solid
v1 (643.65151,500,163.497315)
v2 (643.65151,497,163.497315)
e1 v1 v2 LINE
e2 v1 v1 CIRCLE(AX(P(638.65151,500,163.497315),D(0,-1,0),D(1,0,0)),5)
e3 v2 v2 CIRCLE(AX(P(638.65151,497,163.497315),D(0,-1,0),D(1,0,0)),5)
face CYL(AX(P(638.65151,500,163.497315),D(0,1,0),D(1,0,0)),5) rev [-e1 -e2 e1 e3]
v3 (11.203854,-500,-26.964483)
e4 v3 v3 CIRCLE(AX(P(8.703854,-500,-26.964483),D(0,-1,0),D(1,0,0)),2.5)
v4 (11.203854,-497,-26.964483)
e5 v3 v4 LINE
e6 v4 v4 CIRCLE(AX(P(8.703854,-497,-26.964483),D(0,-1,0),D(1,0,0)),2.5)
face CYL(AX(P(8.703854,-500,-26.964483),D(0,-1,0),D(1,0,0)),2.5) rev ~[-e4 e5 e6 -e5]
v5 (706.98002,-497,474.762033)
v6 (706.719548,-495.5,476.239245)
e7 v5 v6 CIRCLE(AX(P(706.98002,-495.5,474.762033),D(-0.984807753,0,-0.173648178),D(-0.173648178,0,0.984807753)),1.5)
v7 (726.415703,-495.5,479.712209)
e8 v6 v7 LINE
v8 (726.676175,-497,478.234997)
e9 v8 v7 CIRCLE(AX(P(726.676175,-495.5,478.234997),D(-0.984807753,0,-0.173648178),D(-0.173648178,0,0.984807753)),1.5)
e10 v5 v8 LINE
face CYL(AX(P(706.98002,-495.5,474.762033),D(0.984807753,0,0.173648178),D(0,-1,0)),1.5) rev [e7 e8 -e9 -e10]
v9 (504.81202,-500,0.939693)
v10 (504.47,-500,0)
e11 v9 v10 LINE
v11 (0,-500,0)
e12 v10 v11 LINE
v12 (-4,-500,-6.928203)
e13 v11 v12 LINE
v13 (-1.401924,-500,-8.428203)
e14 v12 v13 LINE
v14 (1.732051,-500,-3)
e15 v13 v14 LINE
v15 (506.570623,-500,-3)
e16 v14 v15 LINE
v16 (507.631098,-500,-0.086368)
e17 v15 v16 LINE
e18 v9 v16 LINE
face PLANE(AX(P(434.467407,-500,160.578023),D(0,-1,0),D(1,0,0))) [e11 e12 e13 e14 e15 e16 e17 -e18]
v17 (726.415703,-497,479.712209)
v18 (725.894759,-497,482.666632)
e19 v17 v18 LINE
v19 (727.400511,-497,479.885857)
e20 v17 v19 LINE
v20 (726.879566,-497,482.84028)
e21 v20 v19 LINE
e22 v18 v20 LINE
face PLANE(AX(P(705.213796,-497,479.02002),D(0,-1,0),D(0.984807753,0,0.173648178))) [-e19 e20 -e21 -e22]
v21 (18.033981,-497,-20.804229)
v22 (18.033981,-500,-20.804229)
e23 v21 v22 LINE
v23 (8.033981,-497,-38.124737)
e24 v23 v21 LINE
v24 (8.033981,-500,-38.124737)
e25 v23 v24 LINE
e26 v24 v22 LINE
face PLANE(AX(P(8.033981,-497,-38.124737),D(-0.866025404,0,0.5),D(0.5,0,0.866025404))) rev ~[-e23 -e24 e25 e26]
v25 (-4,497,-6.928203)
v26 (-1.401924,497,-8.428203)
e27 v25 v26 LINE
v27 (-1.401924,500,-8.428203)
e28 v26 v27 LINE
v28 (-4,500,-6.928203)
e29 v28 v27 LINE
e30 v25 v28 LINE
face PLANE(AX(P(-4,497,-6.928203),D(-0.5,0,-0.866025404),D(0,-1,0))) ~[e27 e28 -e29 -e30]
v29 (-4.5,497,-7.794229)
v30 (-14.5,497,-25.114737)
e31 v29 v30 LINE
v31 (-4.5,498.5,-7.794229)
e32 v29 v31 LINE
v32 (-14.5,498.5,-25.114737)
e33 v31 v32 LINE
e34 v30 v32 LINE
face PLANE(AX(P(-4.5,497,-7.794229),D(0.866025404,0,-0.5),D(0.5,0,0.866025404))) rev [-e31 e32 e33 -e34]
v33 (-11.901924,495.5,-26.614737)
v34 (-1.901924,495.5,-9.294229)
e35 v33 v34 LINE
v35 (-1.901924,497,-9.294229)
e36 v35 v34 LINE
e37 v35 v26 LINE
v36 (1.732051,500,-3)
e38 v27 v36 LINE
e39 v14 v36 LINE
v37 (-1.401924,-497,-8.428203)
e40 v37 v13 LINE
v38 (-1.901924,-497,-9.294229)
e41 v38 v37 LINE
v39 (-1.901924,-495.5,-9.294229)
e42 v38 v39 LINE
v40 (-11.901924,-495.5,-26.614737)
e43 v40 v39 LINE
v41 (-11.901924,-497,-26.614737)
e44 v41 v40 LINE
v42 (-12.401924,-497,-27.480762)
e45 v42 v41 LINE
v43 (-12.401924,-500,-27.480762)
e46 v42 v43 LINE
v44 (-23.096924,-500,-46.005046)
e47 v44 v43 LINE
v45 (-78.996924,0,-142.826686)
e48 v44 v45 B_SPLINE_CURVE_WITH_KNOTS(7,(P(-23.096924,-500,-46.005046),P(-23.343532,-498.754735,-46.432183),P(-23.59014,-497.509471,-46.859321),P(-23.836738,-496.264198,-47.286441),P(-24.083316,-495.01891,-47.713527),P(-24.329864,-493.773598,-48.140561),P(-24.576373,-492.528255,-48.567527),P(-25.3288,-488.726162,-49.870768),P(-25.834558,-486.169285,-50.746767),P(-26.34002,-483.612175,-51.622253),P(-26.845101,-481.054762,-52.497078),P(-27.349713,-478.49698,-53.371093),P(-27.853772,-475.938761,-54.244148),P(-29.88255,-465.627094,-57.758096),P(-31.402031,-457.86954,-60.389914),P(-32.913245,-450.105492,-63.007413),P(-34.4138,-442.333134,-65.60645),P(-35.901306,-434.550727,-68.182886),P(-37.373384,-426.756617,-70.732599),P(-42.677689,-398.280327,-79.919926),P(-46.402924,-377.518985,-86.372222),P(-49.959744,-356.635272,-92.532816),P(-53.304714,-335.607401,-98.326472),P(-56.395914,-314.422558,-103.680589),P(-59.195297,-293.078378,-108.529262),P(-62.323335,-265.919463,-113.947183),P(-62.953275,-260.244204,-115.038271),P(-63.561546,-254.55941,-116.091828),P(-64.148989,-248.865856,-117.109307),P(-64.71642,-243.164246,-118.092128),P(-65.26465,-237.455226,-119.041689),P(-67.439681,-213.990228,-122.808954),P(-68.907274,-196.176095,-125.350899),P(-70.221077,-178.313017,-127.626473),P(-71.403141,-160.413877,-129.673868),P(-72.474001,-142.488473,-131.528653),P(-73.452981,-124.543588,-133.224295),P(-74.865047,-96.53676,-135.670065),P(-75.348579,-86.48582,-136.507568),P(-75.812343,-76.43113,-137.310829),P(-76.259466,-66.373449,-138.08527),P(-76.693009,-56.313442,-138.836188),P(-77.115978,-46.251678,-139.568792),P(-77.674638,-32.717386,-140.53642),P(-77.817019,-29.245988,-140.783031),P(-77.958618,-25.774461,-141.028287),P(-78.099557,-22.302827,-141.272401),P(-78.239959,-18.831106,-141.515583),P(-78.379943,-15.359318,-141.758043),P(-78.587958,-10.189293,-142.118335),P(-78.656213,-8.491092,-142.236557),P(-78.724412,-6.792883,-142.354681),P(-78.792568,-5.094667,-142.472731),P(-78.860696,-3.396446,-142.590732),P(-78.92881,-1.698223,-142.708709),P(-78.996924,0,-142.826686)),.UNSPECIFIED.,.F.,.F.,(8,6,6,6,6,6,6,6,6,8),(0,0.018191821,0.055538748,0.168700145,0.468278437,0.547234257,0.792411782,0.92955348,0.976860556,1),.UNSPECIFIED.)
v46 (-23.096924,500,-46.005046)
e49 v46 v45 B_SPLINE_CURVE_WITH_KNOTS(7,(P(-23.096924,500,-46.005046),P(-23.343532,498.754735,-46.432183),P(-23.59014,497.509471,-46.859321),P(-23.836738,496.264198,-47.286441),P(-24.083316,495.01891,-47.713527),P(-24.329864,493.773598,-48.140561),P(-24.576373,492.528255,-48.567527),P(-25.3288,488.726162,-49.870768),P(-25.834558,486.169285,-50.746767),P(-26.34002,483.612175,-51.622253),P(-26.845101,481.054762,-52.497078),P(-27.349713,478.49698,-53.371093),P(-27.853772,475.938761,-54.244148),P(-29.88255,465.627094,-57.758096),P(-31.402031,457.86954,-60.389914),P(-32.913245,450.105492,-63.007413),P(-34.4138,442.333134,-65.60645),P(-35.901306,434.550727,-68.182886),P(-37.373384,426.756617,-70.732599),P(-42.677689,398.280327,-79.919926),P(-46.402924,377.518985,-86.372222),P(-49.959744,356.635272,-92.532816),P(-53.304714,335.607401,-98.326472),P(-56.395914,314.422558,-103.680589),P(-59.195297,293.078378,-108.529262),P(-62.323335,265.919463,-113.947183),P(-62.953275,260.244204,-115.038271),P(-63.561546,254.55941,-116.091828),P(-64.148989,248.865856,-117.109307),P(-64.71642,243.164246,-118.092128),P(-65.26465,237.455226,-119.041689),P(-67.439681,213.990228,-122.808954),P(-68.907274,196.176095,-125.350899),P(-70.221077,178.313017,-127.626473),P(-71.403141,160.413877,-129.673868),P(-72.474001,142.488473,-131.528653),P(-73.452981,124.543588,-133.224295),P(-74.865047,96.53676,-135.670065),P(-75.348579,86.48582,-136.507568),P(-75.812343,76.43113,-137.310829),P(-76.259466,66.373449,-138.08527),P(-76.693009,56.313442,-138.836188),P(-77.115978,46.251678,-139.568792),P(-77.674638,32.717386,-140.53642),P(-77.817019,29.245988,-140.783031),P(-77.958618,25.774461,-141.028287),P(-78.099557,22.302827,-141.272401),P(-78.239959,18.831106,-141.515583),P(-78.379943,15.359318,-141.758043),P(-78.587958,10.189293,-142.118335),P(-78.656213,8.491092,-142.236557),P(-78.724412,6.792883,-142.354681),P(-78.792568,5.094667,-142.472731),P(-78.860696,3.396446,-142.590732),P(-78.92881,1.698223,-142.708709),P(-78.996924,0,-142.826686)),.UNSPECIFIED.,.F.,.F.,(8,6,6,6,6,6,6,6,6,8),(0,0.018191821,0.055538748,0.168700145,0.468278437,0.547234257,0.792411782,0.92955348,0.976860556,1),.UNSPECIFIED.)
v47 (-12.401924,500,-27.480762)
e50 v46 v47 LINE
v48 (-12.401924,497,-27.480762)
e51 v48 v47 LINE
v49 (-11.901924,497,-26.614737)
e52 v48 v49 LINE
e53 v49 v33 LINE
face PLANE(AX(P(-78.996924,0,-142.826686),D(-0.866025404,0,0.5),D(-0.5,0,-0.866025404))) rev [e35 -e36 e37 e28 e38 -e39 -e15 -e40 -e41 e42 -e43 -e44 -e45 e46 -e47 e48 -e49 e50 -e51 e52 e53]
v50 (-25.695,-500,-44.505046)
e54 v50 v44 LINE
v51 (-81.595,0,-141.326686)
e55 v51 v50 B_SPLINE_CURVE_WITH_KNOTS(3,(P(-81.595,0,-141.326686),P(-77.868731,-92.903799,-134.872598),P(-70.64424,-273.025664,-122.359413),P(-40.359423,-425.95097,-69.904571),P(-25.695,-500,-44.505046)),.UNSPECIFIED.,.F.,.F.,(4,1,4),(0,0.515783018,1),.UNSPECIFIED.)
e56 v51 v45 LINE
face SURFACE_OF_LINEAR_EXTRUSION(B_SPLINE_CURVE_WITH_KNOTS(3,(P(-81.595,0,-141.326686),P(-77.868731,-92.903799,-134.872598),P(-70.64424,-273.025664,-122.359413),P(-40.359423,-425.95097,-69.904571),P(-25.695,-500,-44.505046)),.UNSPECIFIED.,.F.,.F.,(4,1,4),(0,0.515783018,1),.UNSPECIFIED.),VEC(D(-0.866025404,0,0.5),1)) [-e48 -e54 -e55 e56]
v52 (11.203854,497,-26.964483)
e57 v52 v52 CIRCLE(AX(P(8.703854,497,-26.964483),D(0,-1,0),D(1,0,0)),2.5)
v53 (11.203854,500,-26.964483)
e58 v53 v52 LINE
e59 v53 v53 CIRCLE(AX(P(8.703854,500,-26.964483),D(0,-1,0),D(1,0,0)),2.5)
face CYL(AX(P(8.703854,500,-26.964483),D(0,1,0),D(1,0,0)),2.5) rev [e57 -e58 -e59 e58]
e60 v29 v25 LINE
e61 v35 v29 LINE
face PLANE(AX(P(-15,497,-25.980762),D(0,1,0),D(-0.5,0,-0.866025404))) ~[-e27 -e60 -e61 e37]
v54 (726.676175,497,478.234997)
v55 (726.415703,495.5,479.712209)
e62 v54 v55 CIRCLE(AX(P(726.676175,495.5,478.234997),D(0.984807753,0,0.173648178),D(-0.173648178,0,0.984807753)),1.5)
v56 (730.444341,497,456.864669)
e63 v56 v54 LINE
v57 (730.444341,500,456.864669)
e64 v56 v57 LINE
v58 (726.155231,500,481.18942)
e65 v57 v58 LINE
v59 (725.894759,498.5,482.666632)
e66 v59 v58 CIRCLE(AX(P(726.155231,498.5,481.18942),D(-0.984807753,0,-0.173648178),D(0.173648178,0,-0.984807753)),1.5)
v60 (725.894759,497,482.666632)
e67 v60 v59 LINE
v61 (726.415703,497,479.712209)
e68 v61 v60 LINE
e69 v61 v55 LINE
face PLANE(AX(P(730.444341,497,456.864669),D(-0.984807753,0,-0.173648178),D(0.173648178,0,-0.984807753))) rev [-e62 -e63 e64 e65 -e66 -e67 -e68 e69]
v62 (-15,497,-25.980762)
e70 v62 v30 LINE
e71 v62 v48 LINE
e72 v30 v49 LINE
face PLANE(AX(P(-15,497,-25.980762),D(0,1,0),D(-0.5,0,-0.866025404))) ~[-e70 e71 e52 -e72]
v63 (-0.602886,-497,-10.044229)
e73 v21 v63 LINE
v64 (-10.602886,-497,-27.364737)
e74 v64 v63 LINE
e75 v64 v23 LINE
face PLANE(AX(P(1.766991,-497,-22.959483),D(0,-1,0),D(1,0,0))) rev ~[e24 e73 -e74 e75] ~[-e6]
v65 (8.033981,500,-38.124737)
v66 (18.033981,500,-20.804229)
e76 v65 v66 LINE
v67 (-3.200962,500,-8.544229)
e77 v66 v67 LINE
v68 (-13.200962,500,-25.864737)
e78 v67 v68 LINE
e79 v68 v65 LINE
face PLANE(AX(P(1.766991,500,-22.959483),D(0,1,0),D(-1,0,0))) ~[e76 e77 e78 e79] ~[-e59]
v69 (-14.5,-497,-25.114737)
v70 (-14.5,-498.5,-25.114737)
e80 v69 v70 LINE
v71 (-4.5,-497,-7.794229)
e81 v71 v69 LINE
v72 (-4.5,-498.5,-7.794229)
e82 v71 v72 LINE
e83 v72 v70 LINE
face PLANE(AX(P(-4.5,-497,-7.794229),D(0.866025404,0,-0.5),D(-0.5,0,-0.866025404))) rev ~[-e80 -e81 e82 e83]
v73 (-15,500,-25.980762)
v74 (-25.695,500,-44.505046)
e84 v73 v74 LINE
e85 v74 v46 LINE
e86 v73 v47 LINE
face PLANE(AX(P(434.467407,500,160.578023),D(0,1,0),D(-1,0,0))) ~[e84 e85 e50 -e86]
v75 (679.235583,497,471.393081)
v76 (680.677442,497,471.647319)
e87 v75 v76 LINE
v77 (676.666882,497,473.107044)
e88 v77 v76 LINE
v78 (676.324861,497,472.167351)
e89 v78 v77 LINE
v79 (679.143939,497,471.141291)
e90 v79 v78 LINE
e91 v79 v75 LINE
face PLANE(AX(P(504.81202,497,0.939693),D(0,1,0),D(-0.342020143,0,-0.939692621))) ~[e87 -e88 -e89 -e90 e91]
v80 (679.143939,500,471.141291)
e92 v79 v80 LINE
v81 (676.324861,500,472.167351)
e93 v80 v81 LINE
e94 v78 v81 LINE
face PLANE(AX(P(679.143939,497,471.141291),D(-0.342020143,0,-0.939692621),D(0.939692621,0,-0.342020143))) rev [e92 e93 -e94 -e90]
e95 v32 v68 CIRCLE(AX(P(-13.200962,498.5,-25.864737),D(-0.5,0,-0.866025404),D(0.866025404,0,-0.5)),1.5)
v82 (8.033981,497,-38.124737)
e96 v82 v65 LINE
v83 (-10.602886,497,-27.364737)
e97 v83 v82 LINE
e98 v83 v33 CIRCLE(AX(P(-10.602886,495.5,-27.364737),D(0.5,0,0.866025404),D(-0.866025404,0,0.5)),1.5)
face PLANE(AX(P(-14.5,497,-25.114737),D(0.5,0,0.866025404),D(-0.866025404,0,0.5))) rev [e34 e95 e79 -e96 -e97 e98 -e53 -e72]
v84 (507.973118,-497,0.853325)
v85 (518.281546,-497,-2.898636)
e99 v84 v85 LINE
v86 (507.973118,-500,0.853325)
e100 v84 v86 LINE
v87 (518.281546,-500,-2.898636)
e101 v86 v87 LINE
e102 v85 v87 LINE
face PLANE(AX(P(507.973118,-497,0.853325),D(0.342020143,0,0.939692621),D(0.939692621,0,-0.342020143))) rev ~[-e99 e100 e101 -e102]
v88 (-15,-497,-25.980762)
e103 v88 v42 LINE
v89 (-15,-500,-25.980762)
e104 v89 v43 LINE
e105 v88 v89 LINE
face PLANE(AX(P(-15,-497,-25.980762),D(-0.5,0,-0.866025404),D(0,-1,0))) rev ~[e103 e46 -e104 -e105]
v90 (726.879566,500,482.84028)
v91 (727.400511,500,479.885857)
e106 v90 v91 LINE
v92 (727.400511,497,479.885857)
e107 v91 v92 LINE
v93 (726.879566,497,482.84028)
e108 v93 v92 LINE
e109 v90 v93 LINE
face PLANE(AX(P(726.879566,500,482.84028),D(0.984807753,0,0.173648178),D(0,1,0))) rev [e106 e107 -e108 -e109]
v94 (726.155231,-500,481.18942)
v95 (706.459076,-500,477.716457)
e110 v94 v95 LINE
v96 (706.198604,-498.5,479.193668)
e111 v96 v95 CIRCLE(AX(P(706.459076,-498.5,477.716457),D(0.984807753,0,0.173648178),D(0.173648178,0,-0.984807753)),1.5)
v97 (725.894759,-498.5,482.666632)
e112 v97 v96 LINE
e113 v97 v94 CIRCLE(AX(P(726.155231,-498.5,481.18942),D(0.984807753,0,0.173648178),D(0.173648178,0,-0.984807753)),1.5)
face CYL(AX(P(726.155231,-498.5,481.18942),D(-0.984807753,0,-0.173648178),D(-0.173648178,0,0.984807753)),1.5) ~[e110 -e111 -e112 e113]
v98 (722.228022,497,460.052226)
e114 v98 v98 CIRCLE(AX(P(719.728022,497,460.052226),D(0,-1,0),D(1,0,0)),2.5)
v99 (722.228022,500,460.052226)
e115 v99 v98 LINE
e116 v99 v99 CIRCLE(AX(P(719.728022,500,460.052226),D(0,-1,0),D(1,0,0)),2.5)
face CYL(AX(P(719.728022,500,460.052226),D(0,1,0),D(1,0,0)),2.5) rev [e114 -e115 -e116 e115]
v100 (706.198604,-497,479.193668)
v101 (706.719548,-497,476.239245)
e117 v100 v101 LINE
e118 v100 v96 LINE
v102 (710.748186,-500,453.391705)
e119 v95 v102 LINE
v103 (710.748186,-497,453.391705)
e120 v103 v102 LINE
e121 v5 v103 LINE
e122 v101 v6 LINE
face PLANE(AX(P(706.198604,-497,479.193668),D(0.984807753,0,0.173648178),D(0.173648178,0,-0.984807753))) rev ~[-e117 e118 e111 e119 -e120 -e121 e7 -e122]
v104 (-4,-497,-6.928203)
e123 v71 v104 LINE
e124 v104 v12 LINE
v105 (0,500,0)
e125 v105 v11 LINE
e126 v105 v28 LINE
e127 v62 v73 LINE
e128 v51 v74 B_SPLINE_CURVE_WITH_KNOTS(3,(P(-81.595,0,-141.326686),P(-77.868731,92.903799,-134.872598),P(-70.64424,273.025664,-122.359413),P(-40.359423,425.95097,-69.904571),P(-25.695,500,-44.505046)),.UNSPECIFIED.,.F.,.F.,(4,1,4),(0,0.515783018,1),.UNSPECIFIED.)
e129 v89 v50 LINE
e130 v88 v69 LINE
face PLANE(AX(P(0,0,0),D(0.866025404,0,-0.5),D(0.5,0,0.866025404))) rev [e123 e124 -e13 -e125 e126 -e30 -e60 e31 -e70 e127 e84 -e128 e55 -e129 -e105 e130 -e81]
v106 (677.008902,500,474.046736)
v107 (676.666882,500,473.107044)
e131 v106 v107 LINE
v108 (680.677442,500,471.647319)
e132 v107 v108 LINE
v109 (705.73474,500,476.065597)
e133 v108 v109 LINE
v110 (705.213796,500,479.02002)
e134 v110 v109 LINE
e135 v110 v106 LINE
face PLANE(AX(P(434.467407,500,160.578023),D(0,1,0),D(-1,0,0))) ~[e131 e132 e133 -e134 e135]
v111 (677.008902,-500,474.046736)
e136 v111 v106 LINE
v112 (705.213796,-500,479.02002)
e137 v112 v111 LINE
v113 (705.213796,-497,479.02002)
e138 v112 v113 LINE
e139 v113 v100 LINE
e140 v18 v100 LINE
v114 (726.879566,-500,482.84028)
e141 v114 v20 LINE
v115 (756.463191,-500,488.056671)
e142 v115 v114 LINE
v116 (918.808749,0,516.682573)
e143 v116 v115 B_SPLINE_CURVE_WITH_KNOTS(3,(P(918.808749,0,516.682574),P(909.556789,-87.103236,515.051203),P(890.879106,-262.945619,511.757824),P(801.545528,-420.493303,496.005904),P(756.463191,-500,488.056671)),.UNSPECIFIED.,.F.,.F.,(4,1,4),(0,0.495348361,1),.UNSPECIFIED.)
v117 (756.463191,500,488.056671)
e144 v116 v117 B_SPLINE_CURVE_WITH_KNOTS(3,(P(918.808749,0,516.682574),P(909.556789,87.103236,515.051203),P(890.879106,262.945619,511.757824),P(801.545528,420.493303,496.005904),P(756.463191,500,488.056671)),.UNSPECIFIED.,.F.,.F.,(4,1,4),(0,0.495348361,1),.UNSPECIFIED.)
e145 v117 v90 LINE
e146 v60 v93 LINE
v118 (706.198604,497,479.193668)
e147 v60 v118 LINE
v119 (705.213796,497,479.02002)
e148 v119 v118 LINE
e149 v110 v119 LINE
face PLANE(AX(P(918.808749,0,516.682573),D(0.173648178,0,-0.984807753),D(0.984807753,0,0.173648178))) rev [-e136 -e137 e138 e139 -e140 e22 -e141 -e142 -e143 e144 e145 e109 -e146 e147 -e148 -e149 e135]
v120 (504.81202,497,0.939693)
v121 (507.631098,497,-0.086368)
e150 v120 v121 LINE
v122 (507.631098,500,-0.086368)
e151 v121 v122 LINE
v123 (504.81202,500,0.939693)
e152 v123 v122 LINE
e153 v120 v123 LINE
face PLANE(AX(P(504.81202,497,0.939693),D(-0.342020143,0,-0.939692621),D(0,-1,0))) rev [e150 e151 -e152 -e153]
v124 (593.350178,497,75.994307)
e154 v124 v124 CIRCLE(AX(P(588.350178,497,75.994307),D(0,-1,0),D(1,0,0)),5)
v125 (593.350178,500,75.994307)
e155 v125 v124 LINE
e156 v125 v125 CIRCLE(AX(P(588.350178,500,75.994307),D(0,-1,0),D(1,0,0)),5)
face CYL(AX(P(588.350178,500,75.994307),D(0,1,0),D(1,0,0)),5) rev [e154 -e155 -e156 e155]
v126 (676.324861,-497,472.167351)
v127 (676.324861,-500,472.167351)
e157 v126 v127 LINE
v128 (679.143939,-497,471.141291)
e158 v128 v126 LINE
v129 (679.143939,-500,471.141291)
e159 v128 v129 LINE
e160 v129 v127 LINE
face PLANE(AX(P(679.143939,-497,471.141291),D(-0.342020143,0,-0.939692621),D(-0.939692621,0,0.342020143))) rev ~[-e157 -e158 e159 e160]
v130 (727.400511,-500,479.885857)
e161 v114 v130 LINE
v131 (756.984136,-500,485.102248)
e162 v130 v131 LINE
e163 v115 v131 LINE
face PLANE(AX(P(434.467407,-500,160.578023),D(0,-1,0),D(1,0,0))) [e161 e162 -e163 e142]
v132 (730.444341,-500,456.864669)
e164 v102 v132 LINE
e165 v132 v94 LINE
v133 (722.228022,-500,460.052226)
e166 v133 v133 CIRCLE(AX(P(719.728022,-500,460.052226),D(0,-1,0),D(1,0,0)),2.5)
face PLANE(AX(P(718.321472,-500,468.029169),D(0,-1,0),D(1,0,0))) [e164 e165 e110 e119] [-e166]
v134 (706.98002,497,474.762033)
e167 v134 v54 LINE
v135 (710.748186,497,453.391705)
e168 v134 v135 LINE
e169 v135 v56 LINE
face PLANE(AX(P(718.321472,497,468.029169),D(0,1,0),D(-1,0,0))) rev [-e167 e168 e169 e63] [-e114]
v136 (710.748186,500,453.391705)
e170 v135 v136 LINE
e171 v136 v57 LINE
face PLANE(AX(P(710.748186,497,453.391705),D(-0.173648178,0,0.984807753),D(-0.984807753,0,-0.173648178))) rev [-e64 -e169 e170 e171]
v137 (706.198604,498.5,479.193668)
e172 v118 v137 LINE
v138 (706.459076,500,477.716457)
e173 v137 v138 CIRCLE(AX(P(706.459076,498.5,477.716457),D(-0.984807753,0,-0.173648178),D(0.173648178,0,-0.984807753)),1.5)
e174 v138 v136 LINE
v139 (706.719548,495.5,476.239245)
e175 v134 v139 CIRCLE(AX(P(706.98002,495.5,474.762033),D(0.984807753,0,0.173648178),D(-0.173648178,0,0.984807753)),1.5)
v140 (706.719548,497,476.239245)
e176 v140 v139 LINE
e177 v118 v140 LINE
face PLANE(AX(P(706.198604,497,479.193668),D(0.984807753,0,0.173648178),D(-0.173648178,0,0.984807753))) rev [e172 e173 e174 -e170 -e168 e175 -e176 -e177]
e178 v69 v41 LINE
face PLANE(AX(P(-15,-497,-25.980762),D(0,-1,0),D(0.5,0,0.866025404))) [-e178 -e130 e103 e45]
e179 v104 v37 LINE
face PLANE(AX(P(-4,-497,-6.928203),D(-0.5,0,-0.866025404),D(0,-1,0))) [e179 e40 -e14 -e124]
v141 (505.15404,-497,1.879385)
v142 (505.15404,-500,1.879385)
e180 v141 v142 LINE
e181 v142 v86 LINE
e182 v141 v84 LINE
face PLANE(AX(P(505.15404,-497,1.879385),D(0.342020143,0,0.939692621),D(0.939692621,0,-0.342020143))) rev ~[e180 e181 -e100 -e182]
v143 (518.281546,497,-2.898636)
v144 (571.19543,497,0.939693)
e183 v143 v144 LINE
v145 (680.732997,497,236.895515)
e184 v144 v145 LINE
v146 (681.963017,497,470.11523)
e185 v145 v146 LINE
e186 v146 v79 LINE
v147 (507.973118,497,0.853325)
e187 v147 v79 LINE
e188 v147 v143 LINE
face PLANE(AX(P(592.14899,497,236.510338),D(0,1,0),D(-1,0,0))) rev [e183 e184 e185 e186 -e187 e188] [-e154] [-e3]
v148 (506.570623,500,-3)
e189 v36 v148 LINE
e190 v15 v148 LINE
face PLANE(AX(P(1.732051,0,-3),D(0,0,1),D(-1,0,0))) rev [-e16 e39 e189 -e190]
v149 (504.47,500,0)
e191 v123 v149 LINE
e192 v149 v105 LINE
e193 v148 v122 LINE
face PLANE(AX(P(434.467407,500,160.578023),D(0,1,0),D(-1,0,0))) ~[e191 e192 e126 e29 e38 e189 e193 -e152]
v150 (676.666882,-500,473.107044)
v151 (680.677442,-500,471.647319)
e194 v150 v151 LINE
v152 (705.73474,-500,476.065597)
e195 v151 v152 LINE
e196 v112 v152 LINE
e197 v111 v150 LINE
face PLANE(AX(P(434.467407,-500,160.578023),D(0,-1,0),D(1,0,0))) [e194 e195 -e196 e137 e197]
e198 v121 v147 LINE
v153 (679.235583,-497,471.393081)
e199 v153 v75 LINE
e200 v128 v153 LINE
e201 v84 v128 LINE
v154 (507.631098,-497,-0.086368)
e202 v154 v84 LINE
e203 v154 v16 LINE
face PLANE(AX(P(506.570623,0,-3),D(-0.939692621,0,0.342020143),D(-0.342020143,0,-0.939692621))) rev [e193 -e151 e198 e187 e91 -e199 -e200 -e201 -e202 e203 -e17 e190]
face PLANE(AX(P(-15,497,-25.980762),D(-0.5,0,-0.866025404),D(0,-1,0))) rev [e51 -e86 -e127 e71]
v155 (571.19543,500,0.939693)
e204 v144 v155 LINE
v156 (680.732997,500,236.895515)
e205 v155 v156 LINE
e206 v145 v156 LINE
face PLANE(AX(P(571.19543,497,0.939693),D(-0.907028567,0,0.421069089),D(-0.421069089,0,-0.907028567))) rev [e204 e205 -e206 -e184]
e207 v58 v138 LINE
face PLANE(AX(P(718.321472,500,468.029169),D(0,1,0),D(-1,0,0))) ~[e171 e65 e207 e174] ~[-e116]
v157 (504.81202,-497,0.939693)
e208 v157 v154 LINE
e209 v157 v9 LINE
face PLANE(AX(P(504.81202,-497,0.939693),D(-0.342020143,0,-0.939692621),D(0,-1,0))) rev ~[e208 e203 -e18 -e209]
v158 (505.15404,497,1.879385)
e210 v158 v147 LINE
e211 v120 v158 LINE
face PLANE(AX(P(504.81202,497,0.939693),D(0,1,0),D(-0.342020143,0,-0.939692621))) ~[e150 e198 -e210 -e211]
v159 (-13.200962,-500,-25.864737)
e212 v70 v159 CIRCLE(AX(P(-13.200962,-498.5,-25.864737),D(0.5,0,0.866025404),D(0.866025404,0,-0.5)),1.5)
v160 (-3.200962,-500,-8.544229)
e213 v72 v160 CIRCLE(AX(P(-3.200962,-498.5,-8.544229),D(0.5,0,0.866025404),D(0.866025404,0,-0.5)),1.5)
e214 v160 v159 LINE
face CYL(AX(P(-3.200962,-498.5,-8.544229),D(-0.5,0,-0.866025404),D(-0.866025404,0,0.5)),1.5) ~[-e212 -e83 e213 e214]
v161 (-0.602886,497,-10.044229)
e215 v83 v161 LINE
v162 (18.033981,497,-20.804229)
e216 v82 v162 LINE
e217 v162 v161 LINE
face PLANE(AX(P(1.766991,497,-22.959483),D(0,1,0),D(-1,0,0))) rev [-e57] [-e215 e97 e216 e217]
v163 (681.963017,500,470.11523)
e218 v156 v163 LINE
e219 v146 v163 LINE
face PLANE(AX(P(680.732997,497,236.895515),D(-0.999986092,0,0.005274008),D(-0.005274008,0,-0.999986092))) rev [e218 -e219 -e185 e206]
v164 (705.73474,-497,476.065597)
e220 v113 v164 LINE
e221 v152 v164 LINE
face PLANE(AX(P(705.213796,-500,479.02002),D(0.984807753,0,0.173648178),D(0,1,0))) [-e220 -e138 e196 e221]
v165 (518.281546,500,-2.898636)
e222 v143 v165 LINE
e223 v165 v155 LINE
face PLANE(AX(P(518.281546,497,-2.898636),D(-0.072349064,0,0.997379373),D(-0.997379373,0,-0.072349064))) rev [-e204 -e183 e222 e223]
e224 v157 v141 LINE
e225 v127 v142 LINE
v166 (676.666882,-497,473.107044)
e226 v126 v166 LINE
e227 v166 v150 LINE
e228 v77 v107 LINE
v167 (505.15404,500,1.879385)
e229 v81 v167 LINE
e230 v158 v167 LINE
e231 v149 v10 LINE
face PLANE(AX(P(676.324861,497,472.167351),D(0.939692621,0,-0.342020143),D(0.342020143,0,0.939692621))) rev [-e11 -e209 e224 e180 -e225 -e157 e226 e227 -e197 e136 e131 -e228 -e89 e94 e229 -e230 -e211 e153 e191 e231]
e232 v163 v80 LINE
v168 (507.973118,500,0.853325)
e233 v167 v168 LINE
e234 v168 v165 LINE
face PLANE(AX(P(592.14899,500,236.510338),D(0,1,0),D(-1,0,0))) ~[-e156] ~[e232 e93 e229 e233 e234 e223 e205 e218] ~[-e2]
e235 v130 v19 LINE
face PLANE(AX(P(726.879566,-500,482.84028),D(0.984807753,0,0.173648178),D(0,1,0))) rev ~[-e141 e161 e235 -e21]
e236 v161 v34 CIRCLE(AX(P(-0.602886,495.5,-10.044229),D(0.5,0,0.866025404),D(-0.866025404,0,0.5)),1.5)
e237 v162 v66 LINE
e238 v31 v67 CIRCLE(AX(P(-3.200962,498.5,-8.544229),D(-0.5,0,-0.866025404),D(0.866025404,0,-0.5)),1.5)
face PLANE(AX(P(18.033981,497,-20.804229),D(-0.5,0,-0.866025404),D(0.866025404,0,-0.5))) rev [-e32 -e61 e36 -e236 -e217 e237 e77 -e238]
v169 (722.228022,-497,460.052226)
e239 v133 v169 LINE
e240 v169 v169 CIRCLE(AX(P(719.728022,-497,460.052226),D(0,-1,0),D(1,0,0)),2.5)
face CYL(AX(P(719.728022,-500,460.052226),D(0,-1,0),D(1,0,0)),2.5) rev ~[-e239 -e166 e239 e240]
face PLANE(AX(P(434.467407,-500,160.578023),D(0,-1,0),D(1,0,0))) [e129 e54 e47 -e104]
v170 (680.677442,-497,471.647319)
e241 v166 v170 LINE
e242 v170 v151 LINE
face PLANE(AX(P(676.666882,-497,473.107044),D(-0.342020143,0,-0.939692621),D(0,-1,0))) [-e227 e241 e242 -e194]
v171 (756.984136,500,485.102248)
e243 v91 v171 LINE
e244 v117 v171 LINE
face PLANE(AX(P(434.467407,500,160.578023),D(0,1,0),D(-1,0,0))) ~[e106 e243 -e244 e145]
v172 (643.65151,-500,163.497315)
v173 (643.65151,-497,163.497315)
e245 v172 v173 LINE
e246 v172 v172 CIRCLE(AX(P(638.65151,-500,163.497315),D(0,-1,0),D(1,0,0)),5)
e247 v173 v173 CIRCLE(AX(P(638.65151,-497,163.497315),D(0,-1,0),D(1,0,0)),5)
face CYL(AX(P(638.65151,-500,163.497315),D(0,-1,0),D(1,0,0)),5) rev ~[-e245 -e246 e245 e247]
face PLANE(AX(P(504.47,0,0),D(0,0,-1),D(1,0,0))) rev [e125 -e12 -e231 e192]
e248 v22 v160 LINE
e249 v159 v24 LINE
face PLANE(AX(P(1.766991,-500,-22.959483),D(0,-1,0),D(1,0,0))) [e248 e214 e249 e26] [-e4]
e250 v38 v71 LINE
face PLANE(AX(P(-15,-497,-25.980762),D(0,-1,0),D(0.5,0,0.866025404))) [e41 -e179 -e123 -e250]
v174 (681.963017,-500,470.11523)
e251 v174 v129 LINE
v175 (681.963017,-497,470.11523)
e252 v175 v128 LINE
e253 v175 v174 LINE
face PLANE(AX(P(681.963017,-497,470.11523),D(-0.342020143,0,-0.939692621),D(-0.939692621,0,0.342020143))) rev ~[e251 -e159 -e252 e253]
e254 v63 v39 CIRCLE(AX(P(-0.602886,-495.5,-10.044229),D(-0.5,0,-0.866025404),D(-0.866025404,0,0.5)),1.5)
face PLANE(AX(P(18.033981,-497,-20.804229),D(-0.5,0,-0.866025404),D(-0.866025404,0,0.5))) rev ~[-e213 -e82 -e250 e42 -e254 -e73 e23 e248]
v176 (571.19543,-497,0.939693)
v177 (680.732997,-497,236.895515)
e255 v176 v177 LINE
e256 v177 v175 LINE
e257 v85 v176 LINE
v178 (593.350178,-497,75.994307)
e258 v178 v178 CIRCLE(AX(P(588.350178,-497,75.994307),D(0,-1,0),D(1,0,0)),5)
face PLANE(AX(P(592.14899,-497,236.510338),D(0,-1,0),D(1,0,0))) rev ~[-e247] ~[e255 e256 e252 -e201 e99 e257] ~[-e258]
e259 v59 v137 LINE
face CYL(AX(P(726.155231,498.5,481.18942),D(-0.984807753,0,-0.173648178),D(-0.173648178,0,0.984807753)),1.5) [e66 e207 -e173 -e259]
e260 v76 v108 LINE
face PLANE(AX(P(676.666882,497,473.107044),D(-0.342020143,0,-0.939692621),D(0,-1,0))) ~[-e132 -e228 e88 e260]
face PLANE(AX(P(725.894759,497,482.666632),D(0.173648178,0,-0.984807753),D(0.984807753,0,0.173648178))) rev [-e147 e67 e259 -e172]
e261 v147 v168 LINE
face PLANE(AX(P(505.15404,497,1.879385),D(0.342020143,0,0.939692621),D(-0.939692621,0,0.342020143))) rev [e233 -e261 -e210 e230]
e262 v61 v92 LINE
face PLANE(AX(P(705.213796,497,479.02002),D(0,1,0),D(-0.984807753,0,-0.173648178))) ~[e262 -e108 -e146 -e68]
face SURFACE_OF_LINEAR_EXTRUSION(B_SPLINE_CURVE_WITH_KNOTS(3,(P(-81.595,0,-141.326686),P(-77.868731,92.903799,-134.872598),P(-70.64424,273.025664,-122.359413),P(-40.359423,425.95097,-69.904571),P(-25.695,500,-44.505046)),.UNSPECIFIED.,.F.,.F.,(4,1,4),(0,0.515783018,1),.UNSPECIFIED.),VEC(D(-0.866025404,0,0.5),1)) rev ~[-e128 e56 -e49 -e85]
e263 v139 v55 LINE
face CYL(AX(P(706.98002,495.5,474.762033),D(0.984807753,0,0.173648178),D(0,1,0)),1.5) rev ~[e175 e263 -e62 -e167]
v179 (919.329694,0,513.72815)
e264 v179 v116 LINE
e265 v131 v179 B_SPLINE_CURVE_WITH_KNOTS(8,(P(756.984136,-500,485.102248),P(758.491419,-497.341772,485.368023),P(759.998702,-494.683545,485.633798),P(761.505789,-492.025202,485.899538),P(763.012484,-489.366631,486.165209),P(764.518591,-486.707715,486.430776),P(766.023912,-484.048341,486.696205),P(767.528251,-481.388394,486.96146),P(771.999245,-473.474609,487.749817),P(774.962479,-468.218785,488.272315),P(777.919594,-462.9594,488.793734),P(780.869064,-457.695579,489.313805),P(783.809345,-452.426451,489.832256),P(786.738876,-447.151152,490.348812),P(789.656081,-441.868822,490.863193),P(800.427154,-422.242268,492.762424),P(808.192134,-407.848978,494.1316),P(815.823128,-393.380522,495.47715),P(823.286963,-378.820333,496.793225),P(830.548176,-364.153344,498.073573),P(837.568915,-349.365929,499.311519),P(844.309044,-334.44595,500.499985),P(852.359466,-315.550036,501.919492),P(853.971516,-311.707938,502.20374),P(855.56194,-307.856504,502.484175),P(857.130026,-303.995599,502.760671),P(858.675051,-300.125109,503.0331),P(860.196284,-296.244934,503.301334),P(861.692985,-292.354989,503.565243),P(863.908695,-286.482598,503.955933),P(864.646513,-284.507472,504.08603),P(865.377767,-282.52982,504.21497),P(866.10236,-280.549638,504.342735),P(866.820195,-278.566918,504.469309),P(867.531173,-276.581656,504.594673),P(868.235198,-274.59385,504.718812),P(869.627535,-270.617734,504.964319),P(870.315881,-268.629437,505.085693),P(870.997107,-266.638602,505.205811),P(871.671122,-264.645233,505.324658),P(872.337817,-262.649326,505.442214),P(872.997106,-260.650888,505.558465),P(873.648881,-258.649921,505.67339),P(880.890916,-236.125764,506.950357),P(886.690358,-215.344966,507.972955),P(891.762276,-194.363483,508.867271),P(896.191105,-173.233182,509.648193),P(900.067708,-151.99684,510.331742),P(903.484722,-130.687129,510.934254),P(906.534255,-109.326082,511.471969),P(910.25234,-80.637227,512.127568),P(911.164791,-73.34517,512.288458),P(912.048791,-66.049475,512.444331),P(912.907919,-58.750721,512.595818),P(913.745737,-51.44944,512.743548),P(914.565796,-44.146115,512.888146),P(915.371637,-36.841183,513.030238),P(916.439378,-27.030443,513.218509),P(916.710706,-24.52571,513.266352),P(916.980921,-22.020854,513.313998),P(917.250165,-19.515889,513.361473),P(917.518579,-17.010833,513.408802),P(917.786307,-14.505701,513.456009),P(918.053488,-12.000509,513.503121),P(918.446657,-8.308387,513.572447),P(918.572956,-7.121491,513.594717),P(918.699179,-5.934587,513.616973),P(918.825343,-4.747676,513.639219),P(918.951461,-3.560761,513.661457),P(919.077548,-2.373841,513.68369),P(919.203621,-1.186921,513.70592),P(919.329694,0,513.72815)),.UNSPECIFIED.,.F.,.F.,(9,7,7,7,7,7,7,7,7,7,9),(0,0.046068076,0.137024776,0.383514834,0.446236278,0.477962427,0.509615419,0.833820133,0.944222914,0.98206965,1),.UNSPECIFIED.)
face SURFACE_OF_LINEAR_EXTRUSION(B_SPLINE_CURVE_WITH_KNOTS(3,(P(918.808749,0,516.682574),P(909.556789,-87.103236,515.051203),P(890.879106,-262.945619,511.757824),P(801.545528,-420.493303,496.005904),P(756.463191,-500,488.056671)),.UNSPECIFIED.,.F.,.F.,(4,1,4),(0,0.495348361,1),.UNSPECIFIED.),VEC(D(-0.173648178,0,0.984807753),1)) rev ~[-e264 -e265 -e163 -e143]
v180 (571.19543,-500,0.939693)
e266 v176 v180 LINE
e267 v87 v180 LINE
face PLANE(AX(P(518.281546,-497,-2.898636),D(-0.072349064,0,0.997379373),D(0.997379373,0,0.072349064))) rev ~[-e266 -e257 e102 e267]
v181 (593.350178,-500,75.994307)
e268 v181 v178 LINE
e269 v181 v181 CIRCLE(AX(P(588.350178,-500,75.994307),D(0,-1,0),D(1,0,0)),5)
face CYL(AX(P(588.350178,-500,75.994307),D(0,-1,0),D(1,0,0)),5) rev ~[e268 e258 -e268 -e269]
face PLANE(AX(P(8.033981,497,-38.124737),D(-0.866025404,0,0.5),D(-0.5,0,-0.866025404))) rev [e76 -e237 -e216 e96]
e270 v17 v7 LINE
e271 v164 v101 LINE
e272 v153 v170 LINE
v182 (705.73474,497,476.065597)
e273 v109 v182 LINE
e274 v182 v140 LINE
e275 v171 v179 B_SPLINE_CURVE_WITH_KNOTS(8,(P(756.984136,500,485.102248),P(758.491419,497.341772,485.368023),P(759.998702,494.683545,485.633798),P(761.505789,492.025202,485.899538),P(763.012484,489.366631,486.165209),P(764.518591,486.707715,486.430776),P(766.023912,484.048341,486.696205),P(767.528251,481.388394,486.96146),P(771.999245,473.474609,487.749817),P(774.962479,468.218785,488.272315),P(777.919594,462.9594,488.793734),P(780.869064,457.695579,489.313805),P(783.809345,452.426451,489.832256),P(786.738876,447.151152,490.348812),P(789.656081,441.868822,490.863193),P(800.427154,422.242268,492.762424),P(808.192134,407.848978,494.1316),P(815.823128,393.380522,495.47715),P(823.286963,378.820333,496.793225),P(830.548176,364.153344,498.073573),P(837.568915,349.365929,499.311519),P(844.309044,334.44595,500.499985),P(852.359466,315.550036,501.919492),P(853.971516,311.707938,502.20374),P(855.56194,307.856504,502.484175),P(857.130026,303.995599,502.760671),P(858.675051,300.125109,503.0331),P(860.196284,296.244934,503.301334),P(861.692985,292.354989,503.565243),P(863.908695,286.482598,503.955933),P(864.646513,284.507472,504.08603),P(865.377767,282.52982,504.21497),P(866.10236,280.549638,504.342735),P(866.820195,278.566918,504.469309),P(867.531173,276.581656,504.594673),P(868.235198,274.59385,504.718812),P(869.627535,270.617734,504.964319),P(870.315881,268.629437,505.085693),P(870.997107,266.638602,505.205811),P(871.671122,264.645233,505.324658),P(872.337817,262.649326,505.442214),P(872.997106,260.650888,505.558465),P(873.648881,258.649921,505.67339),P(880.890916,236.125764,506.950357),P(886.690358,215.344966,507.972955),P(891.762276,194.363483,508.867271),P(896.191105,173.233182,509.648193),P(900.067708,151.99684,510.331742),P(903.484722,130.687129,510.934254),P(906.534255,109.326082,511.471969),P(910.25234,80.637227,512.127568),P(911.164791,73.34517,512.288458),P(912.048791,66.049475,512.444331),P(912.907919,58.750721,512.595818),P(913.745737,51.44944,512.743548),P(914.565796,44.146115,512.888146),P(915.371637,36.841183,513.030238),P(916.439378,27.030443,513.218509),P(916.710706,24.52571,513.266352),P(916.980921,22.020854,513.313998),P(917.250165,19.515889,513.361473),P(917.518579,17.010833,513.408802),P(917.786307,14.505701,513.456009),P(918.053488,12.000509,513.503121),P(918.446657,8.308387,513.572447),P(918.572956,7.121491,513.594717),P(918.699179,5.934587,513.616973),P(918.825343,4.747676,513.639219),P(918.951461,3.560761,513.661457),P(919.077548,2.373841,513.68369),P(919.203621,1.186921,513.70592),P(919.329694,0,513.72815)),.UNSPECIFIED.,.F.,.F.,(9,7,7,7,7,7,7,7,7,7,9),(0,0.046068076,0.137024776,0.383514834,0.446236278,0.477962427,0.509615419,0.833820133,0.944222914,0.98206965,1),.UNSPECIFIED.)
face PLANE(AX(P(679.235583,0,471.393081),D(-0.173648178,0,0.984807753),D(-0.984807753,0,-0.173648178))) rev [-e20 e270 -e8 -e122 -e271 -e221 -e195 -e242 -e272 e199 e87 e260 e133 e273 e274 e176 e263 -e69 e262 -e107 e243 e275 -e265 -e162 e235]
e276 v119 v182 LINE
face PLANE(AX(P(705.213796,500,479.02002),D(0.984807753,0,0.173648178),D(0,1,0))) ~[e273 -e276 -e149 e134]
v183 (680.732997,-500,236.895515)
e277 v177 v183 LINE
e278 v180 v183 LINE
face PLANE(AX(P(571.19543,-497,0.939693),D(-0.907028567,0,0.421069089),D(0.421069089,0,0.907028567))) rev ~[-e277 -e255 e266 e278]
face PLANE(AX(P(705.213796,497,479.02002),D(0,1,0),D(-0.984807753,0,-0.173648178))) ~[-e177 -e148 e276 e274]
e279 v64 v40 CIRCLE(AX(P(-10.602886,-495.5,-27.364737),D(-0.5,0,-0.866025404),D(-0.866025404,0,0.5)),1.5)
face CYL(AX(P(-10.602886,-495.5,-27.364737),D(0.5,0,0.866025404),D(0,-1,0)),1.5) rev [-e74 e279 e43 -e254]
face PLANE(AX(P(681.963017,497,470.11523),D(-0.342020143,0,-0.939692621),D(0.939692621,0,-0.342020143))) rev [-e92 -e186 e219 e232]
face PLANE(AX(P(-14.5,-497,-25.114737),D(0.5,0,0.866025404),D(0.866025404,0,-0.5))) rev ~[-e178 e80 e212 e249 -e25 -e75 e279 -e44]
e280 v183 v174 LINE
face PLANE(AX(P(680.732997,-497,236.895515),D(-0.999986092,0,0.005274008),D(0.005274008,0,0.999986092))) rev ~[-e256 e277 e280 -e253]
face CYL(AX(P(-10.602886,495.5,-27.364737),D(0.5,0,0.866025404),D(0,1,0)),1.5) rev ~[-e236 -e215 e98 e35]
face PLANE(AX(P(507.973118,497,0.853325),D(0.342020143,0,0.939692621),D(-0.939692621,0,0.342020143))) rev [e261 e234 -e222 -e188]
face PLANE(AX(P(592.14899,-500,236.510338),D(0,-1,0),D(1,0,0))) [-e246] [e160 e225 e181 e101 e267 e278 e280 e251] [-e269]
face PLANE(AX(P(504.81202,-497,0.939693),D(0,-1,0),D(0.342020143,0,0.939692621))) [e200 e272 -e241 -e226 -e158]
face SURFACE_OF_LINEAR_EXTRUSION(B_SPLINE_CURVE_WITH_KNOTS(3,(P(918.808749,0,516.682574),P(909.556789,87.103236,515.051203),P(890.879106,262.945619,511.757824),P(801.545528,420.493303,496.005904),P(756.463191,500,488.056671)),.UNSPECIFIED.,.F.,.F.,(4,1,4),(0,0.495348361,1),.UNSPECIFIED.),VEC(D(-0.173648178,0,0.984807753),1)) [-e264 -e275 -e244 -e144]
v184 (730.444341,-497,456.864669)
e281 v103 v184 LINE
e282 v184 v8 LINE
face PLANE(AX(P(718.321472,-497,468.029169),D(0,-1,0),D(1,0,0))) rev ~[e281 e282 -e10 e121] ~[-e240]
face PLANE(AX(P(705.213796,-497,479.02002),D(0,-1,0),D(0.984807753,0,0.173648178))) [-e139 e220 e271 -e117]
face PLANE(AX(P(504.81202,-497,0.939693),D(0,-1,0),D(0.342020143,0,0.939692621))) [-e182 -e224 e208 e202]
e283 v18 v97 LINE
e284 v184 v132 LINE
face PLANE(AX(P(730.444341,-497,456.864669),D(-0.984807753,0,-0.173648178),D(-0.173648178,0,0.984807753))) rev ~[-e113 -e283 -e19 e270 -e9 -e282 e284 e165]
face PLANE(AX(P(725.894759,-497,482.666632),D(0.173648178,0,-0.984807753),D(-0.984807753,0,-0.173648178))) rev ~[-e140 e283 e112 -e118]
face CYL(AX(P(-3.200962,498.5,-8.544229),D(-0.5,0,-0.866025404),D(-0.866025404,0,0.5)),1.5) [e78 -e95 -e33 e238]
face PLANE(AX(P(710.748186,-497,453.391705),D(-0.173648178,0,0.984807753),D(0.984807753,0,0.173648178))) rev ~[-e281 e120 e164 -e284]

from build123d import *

# Parameters (mm, degrees)
F1_DEPTH  = 500
F3_DEPTH  = 25
F5_DEPTH  = 25
F6_W      = 3
F6_H      = 22
F7_DEPTH  = 25
F8_W      = 22
F8_H      = 3
F9_DEPTH  = 25
F11_DEPTH = 3
F12_R     = 1.5
F13_R     = 2.5
F14_DEPTH = 25
F16_DEPTH = 3
F17_R     = 1.5
F18_R     = 2.5
F19_DEPTH = 25
F20_W     = 3
F20_H     = 502.47
F21_DEPTH = 25
F23_DEPTH = 3
F24_R     = 5
F25_DEPTH = 25


with BuildPart() as f1:
    # F0 (on Front) → F1 (new body)
    with BuildSketch(Plane.XZ):
        Polygon((504.47, 0), (0, 0), (-81.595, -141.3266856436), (-78.9969237661, -142.8266856566), (1.7320508226, -3.0000000261), (506.5706226329, -3.0000000261), (679.2355833198, 471.3930805921), (919.3296938381, 513.7281501857), (918.8087493006, 516.6825734704), (677.0089017035, 474.0467364079), align=None)
    extrude(amount=F1_DEPTH)

    # F2 (on face) → F3 (cut)
    with BuildSketch(Plane(origin=(0, 0, 0), x_dir=(0, -1, 0), z_dir=(-0.8660254038, 0, 0.5))):
        with BuildLine():
            add(Edge.make_bspline(
                [(0, -163.19), (92.9037991034, -155.737461166), (273.0256641206, -141.2884805339), (425.9509699186, -80.7188457637), (500, -51.39)],
                knots=[0, 0, 0, 0, 0.5157830178, 1, 1, 1, 1], degree=3))
            Line((0, -163.19), (0, -174.6820956469))
            Line((0, -174.6820956469), (528.7734270096, -174.6820956469))
            Line((528.7734270096, -174.6820956469), (528.7734270096, -51.39))
            Line((528.7734270096, -51.39), (500, -51.39))
        make_face()
    extrude(amount=-F3_DEPTH, mode=Mode.SUBTRACT)

    # F4 (on face) → F5 (cut)
    with BuildSketch(Plane(origin=(-60.6524500815, 0, 343.9771374623), x_dir=(0.984807753, 0, 0.1736481777), z_dir=(-0.1736481777, 0, 0.984807753))):
        with BuildLine():
            Line((994.5709671621, -500), (994.5709671621, 0))
            add(Edge.make_bspline(
                [(994.5709671621, 0), (985.1762808521, -87.1032361942), (966.2104639681, -262.9456191283), (875.4987714572, -420.4933030834), (829.7209671621, -500)],
                knots=[0, 0, 0, 0, 0.4953483611, 1, 1, 1, 1], degree=3))
            Line((829.7209671621, -500), (994.5709671621, -500))
        make_face()
    extrude(amount=-F5_DEPTH, mode=Mode.SUBTRACT)

    # F6 (on face) → F7 (cut)
    with BuildSketch(Plane(origin=(0, 0, 0), x_dir=(0, -1, 0), z_dir=(-0.8660254038, 0, 0.5))):
        with Locations((498.5, -19)):
            Rectangle(F6_W, F6_H)
    extrude(amount=-F7_DEPTH, mode=Mode.SUBTRACT)

    # F8 (on face) → F9 (cut)
    with BuildSketch(Plane(origin=(-60.6524500815, 0, 343.9771374623), x_dir=(0.984807753, 0, 0.1736481777), z_dir=(-0.1736481777, 0, 0.984807753))):
        with Locations((788.6809671621, -498.5)):
            Rectangle(F8_W, F8_H)
    extrude(amount=-F9_DEPTH, mode=Mode.SUBTRACT)

    # F10 (on face) → F11 (join)
    with BuildSketch(Plane.XZ.offset(497)):
        Polygon((730.4443408179, 456.8646688183), (725.894758563, 482.6666319473), (706.1986035028, 479.1936683939), (710.7481857577, 453.391705265), align=None)
    extrude(amount=F11_DEPTH)

    # F12
    f12_edges = [f1.edges().sort_by_distance(p)[0] for p in [
        (716.046681, -500, 480.93015),
        (716.567626, -497, 477.975727),
    ]]
    fillet(f12_edges, radius=F12_R)

    # F13 (on face) → F14 (cut)
    with BuildSketch(Plane.XZ.offset(500)):
        with Locations((719.7280223994, 460.0522258067)):
            Circle(F13_R)
    extrude(amount=-F14_DEPTH, mode=Mode.SUBTRACT)

    # F15 (on face) → F16 (join)
    with BuildSketch(Plane.XZ.offset(497)):
        Polygon((-4.5, -7.7942286341), (-14.5, -25.1147367097), (8.0339810065, -38.1247367097), (18.0339810065, -20.8042286341), align=None)
    extrude(amount=F16_DEPTH)

    # F17
    f17_edges = [f1.edges().sort_by_distance(p)[0] for p in [
        (-9.5, -500, -16.454483),
        (-6.901924, -497, -17.954483),
    ]]
    fillet(f17_edges, radius=F17_R)

    # F18 (on face) → F19 (cut)
    with BuildSketch(Plane.XZ.offset(500)):
        with Locations((8.7038539875, -26.9644826719)):
            Circle(F18_R)
    extrude(amount=-F19_DEPTH, mode=Mode.SUBTRACT)

    # F20 (on face) → F21 (cut)
    with BuildSketch(Plane(origin=(445.4582201101, 0, -162.1335327293), x_dir=(0, -1, 0), z_dir=(-0.9396926208, 0, 0.3420201433))):
        with Locations((498.5, 424.7739017035)):
            Rectangle(F20_W, F20_H)
    extrude(amount=-F21_DEPTH, mode=Mode.SUBTRACT)

    # F22 (on face) → F23 (join)
    with BuildSketch(Plane.XZ.offset(497)):
        Polygon((679.1439393037, 471.1412907274), (676.3248614168, 472.1673511663), (505.1540402867, 1.8793852416), (507.9731181735, 0.8533248027), align=None)
        Polygon((681.9630171416, 470.1152303063), (679.1439393037, 471.1412907274), (507.9731181735, 0.8533248027), (518.281546199, -2.8986361607), (571.1954295904, 0.9396926208), (680.732997499, 236.8955152162), align=None)
    extrude(amount=F23_DEPTH)

    # F24 (on face) → F25 (cut)
    with BuildSketch(Plane.XZ.offset(500)):
        with Locations((588.350177503, 75.9943071688)):
            Circle(F24_R)
        with Locations((638.6515103983, 163.4973151683)):
            Circle(F24_R)
    extrude(amount=-F25_DEPTH, mode=Mode.SUBTRACT)

    # F26: F1 across face


with BuildPart() as f1_1:
    add(f1.part)
    add(f1.part.mirror(Plane(origin=(434.4998955086, 0, 160.5222009708), x_dir=(1, 0, 0), z_dir=(0, 1, 0))))


solid = f1_1.part
